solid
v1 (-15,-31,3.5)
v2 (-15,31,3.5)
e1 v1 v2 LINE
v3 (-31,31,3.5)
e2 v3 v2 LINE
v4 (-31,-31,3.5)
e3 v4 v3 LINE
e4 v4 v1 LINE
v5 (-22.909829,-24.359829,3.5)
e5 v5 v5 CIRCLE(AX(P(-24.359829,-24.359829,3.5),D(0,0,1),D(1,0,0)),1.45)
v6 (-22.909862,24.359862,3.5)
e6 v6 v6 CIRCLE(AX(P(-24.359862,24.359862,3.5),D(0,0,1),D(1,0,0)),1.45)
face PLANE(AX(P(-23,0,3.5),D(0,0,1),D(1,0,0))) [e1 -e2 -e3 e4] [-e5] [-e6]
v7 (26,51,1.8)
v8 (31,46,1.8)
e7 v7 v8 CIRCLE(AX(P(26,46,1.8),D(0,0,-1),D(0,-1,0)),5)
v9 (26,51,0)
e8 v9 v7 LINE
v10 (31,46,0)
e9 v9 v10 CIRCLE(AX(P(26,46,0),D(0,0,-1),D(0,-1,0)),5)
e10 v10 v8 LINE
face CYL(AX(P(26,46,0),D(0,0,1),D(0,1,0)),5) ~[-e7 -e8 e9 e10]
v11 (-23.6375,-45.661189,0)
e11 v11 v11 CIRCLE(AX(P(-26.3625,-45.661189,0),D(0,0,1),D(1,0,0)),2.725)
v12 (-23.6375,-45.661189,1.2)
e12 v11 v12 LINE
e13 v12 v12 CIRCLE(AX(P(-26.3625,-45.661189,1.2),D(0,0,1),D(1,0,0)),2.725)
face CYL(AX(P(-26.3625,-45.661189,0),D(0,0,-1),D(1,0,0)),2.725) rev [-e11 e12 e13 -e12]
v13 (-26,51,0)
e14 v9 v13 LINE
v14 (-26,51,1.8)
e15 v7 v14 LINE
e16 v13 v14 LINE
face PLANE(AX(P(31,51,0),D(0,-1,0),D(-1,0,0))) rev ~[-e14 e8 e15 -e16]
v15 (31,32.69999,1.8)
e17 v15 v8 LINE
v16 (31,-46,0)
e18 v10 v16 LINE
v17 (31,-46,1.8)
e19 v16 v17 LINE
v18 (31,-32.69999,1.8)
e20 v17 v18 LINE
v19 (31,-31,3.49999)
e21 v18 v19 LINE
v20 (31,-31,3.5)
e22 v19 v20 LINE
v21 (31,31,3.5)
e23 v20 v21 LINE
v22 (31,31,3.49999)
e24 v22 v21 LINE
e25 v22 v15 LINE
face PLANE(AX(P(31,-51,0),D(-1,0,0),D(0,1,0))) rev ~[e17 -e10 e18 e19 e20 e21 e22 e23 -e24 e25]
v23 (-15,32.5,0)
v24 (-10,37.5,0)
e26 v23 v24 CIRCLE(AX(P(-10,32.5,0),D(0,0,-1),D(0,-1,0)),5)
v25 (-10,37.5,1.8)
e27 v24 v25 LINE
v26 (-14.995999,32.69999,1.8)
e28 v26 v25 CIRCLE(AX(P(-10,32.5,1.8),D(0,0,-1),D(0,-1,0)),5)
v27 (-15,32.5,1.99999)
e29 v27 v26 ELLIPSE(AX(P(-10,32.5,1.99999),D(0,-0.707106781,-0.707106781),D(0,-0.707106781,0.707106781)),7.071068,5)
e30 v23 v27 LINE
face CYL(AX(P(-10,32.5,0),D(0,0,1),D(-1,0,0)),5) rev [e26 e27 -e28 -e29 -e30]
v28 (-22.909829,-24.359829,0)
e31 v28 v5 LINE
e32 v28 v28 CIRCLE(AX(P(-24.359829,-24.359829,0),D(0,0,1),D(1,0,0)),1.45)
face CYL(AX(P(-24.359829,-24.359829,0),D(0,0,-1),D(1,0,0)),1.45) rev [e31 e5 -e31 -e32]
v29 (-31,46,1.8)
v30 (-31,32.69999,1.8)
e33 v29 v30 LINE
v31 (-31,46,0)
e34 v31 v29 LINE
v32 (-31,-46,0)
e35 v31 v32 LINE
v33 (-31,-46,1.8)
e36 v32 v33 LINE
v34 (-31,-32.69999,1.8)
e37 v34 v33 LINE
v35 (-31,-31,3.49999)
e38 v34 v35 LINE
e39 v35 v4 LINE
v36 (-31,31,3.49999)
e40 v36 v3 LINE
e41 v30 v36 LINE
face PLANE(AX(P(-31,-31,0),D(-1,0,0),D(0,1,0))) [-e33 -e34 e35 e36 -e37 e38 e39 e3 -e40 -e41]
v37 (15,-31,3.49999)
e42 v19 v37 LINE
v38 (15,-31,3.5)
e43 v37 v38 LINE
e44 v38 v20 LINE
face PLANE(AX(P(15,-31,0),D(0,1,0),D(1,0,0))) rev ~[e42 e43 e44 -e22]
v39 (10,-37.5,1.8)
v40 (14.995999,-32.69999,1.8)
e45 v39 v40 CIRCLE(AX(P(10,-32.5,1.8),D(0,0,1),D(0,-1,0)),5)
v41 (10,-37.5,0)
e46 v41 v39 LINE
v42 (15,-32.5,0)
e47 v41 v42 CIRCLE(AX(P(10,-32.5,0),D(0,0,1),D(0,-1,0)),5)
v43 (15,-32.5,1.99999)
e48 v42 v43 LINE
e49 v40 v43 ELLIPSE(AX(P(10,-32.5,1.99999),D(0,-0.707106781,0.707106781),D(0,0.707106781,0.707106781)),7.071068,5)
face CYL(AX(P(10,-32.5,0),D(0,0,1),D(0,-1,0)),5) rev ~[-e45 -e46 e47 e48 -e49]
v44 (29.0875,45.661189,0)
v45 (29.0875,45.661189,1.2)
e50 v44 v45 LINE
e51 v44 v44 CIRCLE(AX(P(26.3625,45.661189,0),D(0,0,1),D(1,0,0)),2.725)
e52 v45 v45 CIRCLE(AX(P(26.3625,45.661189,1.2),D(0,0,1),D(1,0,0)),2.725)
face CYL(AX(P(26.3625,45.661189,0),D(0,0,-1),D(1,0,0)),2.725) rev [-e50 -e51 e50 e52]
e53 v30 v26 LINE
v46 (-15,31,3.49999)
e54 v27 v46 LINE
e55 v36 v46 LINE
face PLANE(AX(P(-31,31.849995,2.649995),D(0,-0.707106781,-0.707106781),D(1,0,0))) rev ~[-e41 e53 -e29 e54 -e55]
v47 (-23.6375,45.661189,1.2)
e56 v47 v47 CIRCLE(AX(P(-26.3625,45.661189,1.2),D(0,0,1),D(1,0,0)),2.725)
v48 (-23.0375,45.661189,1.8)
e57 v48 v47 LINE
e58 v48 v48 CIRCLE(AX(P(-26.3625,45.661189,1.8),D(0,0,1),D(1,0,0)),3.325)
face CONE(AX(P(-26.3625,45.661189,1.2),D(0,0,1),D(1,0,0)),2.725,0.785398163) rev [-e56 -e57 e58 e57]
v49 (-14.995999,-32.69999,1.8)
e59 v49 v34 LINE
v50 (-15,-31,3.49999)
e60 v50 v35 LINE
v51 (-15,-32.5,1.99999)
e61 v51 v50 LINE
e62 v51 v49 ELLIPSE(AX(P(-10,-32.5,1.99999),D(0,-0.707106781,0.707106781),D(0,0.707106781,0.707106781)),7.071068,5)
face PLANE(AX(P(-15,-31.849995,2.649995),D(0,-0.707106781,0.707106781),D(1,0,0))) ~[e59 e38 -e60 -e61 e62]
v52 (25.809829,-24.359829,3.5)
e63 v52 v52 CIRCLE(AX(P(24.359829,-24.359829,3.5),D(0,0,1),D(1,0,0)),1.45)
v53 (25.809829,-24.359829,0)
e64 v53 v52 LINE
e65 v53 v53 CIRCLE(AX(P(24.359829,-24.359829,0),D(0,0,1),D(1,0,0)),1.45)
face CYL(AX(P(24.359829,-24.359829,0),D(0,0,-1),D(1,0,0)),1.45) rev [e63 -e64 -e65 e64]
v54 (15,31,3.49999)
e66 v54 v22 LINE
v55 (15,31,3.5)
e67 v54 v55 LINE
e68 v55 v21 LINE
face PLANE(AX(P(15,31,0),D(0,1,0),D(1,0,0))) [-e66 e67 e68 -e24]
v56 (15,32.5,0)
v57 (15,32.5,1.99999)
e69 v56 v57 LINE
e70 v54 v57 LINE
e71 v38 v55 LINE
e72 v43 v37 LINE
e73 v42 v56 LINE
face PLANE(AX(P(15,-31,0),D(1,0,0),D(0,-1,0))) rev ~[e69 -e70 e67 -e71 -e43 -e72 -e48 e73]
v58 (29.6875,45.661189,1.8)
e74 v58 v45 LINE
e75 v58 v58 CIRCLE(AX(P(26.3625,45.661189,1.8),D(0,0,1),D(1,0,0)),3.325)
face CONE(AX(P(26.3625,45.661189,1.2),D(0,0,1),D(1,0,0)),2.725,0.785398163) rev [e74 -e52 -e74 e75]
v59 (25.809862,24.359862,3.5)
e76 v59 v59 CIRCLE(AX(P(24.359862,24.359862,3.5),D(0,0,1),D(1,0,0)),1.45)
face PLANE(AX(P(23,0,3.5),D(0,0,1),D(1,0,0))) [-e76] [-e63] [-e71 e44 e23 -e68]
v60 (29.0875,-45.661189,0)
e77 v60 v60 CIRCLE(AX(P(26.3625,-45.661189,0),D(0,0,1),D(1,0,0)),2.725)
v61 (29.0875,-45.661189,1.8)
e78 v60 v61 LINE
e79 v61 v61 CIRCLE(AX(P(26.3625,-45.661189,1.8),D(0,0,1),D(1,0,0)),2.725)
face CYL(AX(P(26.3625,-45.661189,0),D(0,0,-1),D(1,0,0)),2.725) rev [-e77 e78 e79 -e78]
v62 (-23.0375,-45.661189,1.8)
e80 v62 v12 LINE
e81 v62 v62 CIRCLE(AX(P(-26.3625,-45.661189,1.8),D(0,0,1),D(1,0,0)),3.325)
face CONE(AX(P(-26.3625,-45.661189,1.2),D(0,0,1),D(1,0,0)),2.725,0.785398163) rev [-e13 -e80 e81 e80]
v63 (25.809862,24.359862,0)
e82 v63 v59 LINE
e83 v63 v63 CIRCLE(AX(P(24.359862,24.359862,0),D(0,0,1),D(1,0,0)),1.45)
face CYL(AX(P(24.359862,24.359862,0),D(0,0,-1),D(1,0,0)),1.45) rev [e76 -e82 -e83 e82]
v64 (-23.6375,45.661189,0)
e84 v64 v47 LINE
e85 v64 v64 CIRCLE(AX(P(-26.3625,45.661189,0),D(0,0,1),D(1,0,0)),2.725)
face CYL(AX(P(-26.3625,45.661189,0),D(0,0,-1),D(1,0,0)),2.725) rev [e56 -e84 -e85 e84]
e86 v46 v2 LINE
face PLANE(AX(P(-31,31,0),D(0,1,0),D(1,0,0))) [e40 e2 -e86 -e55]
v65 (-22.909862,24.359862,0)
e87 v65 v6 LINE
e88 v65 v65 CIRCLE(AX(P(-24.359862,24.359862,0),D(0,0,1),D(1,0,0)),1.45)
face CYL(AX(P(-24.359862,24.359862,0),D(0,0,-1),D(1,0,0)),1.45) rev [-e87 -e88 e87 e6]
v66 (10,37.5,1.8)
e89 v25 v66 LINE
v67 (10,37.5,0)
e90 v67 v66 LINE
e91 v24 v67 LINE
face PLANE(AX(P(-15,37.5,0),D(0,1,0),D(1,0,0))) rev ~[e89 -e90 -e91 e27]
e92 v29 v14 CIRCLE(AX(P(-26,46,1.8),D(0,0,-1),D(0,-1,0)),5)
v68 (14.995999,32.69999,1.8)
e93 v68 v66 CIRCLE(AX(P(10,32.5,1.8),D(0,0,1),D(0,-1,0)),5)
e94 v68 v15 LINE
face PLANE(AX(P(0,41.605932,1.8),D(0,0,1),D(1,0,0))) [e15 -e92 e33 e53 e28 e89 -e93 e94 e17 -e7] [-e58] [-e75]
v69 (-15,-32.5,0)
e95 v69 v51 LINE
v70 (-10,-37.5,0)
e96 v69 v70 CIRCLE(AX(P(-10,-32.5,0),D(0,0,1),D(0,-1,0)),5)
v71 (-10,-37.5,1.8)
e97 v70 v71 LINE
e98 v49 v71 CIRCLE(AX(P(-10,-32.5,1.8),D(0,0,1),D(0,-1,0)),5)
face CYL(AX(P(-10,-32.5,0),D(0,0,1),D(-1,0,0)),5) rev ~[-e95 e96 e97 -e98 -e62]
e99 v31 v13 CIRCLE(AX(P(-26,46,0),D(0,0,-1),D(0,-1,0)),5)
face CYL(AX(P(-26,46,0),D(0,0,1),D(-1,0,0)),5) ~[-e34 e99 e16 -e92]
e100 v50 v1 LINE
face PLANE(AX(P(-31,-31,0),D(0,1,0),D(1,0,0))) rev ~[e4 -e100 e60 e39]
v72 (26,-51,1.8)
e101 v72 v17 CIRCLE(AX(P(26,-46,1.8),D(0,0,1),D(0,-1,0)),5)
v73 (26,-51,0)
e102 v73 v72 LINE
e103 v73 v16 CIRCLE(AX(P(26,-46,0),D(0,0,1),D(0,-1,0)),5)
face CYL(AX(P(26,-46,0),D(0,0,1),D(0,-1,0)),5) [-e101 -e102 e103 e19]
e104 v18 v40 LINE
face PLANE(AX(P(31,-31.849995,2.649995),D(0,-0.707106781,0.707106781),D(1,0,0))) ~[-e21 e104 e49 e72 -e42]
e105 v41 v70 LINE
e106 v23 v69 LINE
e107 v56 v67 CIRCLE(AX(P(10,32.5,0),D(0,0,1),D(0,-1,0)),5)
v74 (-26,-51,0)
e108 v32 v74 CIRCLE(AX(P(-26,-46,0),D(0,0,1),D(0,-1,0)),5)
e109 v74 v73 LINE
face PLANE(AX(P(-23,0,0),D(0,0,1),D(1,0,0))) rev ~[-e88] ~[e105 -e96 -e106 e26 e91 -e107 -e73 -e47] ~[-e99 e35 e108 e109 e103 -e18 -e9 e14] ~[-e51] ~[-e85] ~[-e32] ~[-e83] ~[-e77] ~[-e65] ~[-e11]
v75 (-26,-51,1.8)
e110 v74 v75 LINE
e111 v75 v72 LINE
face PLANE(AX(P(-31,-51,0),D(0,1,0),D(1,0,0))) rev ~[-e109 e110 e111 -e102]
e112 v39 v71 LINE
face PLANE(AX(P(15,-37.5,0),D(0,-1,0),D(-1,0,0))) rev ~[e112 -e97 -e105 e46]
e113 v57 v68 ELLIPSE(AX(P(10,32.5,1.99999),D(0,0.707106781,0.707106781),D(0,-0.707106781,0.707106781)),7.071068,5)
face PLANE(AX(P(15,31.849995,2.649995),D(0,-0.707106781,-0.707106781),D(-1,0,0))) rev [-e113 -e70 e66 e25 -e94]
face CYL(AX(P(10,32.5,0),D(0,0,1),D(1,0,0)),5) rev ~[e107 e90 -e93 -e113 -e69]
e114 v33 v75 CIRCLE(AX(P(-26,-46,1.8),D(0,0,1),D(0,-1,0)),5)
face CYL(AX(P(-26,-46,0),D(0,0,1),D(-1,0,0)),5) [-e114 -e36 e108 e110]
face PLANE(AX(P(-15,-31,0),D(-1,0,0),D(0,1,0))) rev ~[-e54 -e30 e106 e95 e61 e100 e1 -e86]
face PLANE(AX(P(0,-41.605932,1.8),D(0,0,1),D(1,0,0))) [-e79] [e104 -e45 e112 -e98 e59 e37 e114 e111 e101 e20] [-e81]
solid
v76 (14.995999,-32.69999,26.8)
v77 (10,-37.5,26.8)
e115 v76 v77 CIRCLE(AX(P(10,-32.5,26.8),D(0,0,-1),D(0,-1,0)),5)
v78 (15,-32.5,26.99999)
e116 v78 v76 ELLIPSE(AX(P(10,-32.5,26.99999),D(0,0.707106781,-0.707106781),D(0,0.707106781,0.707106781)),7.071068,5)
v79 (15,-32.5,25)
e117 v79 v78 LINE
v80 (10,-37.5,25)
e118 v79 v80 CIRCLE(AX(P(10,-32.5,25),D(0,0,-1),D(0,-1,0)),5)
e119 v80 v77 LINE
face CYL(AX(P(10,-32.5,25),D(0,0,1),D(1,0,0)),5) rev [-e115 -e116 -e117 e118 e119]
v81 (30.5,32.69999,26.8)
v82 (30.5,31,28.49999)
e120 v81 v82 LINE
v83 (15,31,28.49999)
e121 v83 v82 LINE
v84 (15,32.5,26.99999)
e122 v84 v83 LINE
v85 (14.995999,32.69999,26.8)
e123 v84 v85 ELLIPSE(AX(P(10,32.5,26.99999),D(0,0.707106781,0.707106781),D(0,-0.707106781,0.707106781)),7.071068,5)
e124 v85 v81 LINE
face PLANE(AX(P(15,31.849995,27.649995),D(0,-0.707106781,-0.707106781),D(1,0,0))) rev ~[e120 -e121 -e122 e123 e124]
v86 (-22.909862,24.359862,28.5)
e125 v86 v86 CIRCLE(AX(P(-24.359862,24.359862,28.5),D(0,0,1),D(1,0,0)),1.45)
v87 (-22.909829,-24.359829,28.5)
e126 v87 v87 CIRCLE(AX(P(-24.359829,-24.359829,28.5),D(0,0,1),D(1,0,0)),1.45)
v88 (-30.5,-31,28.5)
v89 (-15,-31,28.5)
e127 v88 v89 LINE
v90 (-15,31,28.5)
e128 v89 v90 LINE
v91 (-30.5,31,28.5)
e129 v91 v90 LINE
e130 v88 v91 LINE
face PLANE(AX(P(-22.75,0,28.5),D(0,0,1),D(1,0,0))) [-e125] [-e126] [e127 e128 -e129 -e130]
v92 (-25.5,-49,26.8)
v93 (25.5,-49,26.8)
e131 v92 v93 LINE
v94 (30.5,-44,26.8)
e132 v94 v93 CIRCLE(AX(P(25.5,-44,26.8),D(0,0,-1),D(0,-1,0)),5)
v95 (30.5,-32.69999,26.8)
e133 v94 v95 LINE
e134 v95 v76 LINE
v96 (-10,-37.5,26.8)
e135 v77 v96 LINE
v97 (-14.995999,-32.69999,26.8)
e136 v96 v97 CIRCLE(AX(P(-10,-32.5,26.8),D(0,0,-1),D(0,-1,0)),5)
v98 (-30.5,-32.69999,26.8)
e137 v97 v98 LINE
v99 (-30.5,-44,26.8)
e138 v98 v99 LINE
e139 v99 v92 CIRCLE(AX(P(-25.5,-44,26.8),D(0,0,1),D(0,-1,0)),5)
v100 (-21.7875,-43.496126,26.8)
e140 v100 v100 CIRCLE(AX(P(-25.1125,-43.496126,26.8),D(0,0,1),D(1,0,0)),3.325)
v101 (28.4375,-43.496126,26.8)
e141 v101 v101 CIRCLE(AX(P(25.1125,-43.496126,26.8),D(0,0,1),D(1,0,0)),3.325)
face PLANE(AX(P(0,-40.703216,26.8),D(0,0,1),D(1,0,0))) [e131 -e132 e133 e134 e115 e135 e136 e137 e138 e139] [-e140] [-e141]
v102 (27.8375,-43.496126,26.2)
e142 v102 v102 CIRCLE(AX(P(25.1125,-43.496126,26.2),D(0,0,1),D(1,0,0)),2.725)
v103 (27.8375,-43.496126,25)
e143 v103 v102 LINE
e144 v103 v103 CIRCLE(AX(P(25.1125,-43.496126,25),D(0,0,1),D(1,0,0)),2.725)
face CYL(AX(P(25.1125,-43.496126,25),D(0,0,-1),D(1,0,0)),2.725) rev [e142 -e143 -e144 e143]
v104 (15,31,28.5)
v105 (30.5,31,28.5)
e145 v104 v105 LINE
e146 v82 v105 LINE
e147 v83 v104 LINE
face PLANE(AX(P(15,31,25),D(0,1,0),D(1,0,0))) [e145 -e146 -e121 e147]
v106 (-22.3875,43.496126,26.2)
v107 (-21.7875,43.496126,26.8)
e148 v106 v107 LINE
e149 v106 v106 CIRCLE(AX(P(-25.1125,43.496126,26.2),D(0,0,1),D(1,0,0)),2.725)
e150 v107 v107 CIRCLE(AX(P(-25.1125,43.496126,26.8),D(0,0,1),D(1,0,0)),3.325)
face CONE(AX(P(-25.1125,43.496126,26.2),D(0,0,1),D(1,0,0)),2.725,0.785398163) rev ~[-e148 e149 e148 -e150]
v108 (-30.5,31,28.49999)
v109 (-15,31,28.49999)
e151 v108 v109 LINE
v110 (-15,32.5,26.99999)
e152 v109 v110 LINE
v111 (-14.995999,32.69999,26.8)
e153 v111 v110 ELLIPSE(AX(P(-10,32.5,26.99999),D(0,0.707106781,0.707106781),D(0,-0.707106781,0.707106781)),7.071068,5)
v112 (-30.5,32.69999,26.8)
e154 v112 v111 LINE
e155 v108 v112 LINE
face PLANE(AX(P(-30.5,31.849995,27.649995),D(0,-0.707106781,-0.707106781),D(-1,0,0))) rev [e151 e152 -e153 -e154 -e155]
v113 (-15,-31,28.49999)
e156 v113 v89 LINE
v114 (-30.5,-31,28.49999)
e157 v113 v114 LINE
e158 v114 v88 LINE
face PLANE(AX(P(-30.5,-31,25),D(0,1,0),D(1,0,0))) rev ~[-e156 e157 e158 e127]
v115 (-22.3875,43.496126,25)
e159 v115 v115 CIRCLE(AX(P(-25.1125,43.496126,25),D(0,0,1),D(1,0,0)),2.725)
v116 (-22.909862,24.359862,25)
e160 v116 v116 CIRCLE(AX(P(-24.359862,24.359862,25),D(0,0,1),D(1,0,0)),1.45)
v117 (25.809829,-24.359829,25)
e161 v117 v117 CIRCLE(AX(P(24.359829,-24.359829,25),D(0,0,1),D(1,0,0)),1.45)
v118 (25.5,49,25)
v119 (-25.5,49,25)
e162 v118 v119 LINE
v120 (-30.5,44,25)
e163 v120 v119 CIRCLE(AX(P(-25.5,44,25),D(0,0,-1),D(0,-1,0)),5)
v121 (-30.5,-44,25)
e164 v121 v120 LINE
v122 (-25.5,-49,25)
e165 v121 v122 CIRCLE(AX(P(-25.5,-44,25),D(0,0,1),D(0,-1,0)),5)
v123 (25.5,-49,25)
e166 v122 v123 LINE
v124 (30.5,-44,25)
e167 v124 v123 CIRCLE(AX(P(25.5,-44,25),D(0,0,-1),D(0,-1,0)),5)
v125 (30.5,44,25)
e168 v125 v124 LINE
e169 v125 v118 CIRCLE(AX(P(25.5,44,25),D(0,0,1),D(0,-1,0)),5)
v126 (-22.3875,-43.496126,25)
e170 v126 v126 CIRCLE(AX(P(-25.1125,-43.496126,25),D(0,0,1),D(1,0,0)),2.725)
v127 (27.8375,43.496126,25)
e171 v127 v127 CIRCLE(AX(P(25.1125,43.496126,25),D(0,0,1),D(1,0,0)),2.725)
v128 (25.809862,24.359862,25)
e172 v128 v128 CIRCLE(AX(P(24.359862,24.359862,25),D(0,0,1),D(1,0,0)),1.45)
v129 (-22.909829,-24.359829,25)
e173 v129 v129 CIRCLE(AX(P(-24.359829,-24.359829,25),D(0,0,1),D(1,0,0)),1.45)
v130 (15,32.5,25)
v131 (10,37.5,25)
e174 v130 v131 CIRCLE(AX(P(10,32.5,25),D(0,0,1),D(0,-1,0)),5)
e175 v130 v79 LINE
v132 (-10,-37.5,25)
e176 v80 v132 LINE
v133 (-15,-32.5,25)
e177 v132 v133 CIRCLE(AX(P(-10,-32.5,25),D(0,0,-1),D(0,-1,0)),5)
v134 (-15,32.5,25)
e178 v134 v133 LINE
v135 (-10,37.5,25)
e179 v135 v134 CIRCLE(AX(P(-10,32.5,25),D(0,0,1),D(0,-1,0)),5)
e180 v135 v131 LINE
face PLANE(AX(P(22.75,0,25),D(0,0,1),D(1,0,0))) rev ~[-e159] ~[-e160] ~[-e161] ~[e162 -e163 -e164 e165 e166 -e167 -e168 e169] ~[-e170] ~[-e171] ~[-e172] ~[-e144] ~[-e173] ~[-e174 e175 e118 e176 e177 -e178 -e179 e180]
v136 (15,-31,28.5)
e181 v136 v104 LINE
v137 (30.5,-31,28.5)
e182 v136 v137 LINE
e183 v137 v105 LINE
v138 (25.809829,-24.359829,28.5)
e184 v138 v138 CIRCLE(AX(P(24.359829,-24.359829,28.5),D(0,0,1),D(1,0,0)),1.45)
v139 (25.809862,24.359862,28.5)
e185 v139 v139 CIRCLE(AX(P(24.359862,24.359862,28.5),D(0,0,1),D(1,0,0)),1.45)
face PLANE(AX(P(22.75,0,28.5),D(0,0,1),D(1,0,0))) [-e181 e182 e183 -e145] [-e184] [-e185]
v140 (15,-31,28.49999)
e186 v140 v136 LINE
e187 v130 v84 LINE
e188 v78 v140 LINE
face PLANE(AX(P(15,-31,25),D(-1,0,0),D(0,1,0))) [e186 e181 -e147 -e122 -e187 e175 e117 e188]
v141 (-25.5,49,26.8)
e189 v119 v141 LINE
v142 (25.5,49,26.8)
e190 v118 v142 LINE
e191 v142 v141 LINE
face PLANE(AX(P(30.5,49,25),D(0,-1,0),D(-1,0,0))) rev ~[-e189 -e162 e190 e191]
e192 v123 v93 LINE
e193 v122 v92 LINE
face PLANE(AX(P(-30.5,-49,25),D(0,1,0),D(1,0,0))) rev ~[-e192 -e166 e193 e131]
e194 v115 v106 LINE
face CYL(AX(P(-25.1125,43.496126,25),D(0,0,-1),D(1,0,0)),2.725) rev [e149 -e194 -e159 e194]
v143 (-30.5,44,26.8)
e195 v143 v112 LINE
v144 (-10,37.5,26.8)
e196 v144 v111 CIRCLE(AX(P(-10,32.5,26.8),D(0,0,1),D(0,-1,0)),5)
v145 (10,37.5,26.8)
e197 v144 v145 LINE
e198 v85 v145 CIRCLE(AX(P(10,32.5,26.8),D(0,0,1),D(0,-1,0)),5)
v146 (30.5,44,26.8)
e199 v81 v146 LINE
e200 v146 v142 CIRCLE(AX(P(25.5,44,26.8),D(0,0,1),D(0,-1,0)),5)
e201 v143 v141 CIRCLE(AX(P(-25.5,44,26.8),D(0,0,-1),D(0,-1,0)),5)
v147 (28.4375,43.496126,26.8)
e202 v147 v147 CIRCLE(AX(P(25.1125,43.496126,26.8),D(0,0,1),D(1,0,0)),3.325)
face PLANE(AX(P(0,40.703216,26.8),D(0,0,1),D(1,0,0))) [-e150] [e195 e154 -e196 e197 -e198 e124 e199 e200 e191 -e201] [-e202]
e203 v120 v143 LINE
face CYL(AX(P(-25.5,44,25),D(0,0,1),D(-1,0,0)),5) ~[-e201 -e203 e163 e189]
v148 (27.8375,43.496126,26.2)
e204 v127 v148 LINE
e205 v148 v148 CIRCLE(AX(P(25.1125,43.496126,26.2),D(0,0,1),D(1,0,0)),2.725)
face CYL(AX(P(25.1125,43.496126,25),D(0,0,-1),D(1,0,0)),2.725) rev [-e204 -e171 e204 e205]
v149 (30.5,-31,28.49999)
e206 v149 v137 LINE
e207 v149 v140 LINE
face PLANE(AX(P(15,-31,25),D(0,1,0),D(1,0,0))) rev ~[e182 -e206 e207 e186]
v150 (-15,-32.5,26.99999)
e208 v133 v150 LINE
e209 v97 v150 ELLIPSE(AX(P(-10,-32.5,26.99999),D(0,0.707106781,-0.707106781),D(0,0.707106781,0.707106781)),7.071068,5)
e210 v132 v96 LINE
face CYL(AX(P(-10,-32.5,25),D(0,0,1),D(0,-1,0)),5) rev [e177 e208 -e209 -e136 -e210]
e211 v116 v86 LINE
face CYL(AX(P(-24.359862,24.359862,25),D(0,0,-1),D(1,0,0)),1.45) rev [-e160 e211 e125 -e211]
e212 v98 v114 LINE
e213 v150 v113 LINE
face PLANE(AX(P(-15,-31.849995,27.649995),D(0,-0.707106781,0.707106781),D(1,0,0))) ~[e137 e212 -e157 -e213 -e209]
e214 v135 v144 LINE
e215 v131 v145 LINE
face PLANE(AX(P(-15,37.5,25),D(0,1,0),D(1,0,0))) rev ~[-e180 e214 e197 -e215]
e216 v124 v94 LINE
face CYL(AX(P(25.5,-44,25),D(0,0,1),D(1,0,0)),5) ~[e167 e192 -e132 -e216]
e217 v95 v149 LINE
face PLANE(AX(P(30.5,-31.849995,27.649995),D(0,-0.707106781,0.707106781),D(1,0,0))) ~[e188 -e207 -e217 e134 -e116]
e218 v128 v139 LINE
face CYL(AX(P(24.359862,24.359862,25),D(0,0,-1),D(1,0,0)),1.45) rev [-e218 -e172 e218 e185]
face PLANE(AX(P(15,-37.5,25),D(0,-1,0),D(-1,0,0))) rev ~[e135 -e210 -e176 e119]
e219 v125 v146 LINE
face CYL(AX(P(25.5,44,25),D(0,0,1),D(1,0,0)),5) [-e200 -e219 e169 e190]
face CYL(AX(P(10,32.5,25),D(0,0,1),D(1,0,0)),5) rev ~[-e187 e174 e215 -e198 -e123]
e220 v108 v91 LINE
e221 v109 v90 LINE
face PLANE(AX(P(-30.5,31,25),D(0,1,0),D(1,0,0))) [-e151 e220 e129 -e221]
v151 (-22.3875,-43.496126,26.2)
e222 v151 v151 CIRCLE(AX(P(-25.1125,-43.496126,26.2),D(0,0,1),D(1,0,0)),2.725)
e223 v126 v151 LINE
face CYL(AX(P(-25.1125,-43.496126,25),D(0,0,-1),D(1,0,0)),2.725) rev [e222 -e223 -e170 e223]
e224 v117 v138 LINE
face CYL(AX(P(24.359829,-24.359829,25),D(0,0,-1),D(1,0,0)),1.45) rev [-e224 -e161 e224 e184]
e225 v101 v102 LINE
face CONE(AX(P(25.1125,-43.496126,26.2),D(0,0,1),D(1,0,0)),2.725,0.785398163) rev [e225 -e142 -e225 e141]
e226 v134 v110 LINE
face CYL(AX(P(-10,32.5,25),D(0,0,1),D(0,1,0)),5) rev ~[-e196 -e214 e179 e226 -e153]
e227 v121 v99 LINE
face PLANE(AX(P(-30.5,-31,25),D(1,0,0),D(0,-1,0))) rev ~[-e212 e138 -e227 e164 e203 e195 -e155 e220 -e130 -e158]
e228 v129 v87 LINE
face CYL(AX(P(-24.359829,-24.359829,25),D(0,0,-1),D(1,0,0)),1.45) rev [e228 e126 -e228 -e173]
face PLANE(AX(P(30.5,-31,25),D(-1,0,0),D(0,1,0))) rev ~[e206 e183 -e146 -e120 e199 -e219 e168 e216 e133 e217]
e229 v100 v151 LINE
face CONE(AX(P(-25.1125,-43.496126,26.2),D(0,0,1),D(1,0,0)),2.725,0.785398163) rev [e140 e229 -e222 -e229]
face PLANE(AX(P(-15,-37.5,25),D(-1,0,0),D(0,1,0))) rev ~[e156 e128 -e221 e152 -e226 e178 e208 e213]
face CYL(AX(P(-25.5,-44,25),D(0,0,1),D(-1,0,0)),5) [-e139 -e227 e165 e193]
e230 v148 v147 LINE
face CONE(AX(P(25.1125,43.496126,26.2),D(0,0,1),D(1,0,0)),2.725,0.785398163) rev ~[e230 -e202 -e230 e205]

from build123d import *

# Parameters (mm, degrees)
F1_R      = 2.725
F3_DEPTH  = 1.8
F2_R      = 2.725
F1_W      = 16
F1_H      = 62
F1_R_2    = 1.45
F4_DEPTH  = 3.5
F2_W      = 15.5
F2_H      = 62
F2_R_2    = 1.45
F5_SIZE   = 1.69999
F5_2_SIZE = 1.69999
F6_R      = 5
F6_2_R    = 5
F7_SIZE   = 0.6
F7_2_SIZE = 0.6


# Not quite as in the source:
# - a fillet or chamfer is up to 0.001 mm smaller than in the source, because OpenCascade refuses the exact size


with BuildPart() as f3:
    # F1 (on Top) → F3 (new body)
    with BuildSketch(Plane.XY):
        Polygon((-15, -31), (-31, -31), (-31, -51), (31, -51), (31, -31), (15, -31), (15, -37.5), (-15, -37.5), align=None)
        with Locations((-26.3625, -45.6611894145)):
            Circle(F1_R, mode=Mode.SUBTRACT)
        with Locations((26.3625, -45.6611894145)):
            Circle(F1_R, mode=Mode.SUBTRACT)
    extrude(amount=F3_DEPTH)



with BuildPart() as f3b:
    # F1 (on Top) → F3, piece 2 (new body)
    with BuildSketch(Plane.XY):
        Polygon((31, 51), (-31, 51), (-31, 31), (-15, 31), (-15, 37.5), (15, 37.5), (15, 31), (31, 31), align=None)
        with Locations((-26.3625, 45.6611894145)):
            Circle(F1_R, mode=Mode.SUBTRACT)
        with Locations((26.3625, 45.6611894145)):
            Circle(F1_R, mode=Mode.SUBTRACT)
    extrude(amount=F3_DEPTH)


with BuildPart() as f3c:
    # F2 (on offset) → F3, piece 3 (new body)
    with BuildSketch(Plane.XY.offset(25)):
        Polygon((-15, -31), (-30.5, -31), (-30.5, -49), (30.5, -49), (30.5, -31), (15, -31), (15, -37.5), (-15, -37.5), align=None)
        with Locations((-25.1125, -43.4961259051)):
            Circle(F2_R, mode=Mode.SUBTRACT)
        with Locations((25.1125, -43.4961259051)):
            Circle(F2_R, mode=Mode.SUBTRACT)
    extrude(amount=F3_DEPTH)



with BuildPart() as f3d:
    # F2 (on offset) → F3, piece 4 (new body)
    with BuildSketch(Plane.XY.offset(25)):
        Polygon((30.5, 49), (-30.5, 49), (-30.5, 31), (-15, 31), (-15, 37.5), (15, 37.5), (15, 31), (30.5, 31), align=None)
        with Locations((-25.1125, 43.4961259051)):
            Circle(F2_R, mode=Mode.SUBTRACT)
        with Locations((25.1125, 43.4961259051)):
            Circle(F2_R, mode=Mode.SUBTRACT)
    extrude(amount=F3_DEPTH)


with BuildPart() as f3_1:
    add(f3.part)

    add(f3b.part)  # F4 merges F3b
    # F1 (on Top) → F4 (join)
    with BuildSketch(Plane.XY):
        with Locations((-23, 0)):
            Rectangle(F1_W, F1_H)
        with Locations((-24.3598286119, -24.3598286119)):
            Circle(F1_R_2, mode=Mode.SUBTRACT)
        with Locations((-24.3598622407, 24.3598622407)):
            Circle(F1_R_2, mode=Mode.SUBTRACT)
        with Locations((23, 0)):
            Rectangle(F1_W, F1_H)
        with Locations((24.3598286119, -24.3598286119)):
            Circle(F1_R_2, mode=Mode.SUBTRACT)
        with Locations((24.3598622407, 24.3598622407)):
            Circle(F1_R_2, mode=Mode.SUBTRACT)
    extrude(amount=F4_DEPTH)

    # F5 (size 1.7 in the source; OpenCascade refuses exactly that, so slightly less here)
    f5_edges = [f3_1.edges().sort_by_distance(p)[0] for p in [
        (-23, -31, 1.8),
        (23, -31, 1.8),
        (-23, 31, 1.8),
        (23, 31, 1.8),
    ]]
    chamfer(f5_edges, length=F5_SIZE)

    # F6#2
    f6_2_edges = [f3_1.edges().sort_by_distance(p)[0] for p in [
        (-15, 37.5, 0.9),
        (15, 37.5, 0.9),
        (31, -51, 0.9),
        (-31, -51, 0.9),
        (31, 51, 0.9),
        (-15, -37.5, 0.9),
        (15, -37.5, 0.9),
        (-31, 51, 0.9),
    ]]
    fillet(f6_2_edges, radius=F6_2_R)

    # F7
    f7_edges = [f3_1.edges().sort_by_distance(p)[0] for p in [
        (23.6375, 45.661189, 1.8),
        (-29.0875, 45.661189, 1.8),
        (-29.0875, -45.661189, 1.8),
    ]]
    chamfer(f7_edges, length=F7_SIZE)


with BuildPart() as f3c_1:
    add(f3c.part)

    add(f3d.part)  # F4#2 merges F3d
    # F2 (on offset) → F4, piece 2 (join)
    with BuildSketch(Plane.XY.offset(25)):
        with Locations((22.75, 0)):
            Rectangle(F2_W, F2_H)
        with Locations((24.3598286119, -24.3598286119)):
            Circle(F2_R_2, mode=Mode.SUBTRACT)
        with Locations((24.3598622407, 24.3598622407)):
            Circle(F2_R_2, mode=Mode.SUBTRACT)
        with Locations((-22.75, 0)):
            Rectangle(F2_W, F2_H)
        with Locations((-24.3598286119, -24.3598286119)):
            Circle(F2_R_2, mode=Mode.SUBTRACT)
        with Locations((-24.3598622407, 24.3598622407)):
            Circle(F2_R_2, mode=Mode.SUBTRACT)
    extrude(amount=F4_DEPTH)

    # F5#2 (size 1.7 in the source; OpenCascade refuses exactly that, so slightly less here)
    f5_2_edges = [f3c_1.edges().sort_by_distance(p)[0] for p in [
        (-22.75, -31, 26.8),
        (22.75, -31, 26.8),
        (-22.75, 31, 26.8),
        (22.75, 31, 26.8),
    ]]
    chamfer(f5_2_edges, length=F5_2_SIZE)

    # F6
    f6_edges = [f3c_1.edges().sort_by_distance(p)[0] for p in [
        (30.5, -49, 25.9),
        (-30.5, -49, 25.9),
        (15, 37.5, 25.9),
        (-15, 37.5, 25.9),
        (30.5, 49, 25.9),
        (-15, -37.5, 25.9),
        (15, -37.5, 25.9),
        (-30.5, 49, 25.9),
    ]]
    fillet(f6_edges, radius=F6_R)

    # F7#2
    f7_2_edges = [f3c_1.edges().sort_by_distance(p)[0] for p in [
        (-27.8375, 43.496126, 26.8),
        (22.3875, 43.496126, 26.8),
        (22.3875, -43.496126, 26.8),
        (-27.8375, -43.496126, 26.8),
    ]]
    chamfer(f7_2_edges, length=F7_2_SIZE)


solid = Compound([f3_1.part, f3c_1.part])
